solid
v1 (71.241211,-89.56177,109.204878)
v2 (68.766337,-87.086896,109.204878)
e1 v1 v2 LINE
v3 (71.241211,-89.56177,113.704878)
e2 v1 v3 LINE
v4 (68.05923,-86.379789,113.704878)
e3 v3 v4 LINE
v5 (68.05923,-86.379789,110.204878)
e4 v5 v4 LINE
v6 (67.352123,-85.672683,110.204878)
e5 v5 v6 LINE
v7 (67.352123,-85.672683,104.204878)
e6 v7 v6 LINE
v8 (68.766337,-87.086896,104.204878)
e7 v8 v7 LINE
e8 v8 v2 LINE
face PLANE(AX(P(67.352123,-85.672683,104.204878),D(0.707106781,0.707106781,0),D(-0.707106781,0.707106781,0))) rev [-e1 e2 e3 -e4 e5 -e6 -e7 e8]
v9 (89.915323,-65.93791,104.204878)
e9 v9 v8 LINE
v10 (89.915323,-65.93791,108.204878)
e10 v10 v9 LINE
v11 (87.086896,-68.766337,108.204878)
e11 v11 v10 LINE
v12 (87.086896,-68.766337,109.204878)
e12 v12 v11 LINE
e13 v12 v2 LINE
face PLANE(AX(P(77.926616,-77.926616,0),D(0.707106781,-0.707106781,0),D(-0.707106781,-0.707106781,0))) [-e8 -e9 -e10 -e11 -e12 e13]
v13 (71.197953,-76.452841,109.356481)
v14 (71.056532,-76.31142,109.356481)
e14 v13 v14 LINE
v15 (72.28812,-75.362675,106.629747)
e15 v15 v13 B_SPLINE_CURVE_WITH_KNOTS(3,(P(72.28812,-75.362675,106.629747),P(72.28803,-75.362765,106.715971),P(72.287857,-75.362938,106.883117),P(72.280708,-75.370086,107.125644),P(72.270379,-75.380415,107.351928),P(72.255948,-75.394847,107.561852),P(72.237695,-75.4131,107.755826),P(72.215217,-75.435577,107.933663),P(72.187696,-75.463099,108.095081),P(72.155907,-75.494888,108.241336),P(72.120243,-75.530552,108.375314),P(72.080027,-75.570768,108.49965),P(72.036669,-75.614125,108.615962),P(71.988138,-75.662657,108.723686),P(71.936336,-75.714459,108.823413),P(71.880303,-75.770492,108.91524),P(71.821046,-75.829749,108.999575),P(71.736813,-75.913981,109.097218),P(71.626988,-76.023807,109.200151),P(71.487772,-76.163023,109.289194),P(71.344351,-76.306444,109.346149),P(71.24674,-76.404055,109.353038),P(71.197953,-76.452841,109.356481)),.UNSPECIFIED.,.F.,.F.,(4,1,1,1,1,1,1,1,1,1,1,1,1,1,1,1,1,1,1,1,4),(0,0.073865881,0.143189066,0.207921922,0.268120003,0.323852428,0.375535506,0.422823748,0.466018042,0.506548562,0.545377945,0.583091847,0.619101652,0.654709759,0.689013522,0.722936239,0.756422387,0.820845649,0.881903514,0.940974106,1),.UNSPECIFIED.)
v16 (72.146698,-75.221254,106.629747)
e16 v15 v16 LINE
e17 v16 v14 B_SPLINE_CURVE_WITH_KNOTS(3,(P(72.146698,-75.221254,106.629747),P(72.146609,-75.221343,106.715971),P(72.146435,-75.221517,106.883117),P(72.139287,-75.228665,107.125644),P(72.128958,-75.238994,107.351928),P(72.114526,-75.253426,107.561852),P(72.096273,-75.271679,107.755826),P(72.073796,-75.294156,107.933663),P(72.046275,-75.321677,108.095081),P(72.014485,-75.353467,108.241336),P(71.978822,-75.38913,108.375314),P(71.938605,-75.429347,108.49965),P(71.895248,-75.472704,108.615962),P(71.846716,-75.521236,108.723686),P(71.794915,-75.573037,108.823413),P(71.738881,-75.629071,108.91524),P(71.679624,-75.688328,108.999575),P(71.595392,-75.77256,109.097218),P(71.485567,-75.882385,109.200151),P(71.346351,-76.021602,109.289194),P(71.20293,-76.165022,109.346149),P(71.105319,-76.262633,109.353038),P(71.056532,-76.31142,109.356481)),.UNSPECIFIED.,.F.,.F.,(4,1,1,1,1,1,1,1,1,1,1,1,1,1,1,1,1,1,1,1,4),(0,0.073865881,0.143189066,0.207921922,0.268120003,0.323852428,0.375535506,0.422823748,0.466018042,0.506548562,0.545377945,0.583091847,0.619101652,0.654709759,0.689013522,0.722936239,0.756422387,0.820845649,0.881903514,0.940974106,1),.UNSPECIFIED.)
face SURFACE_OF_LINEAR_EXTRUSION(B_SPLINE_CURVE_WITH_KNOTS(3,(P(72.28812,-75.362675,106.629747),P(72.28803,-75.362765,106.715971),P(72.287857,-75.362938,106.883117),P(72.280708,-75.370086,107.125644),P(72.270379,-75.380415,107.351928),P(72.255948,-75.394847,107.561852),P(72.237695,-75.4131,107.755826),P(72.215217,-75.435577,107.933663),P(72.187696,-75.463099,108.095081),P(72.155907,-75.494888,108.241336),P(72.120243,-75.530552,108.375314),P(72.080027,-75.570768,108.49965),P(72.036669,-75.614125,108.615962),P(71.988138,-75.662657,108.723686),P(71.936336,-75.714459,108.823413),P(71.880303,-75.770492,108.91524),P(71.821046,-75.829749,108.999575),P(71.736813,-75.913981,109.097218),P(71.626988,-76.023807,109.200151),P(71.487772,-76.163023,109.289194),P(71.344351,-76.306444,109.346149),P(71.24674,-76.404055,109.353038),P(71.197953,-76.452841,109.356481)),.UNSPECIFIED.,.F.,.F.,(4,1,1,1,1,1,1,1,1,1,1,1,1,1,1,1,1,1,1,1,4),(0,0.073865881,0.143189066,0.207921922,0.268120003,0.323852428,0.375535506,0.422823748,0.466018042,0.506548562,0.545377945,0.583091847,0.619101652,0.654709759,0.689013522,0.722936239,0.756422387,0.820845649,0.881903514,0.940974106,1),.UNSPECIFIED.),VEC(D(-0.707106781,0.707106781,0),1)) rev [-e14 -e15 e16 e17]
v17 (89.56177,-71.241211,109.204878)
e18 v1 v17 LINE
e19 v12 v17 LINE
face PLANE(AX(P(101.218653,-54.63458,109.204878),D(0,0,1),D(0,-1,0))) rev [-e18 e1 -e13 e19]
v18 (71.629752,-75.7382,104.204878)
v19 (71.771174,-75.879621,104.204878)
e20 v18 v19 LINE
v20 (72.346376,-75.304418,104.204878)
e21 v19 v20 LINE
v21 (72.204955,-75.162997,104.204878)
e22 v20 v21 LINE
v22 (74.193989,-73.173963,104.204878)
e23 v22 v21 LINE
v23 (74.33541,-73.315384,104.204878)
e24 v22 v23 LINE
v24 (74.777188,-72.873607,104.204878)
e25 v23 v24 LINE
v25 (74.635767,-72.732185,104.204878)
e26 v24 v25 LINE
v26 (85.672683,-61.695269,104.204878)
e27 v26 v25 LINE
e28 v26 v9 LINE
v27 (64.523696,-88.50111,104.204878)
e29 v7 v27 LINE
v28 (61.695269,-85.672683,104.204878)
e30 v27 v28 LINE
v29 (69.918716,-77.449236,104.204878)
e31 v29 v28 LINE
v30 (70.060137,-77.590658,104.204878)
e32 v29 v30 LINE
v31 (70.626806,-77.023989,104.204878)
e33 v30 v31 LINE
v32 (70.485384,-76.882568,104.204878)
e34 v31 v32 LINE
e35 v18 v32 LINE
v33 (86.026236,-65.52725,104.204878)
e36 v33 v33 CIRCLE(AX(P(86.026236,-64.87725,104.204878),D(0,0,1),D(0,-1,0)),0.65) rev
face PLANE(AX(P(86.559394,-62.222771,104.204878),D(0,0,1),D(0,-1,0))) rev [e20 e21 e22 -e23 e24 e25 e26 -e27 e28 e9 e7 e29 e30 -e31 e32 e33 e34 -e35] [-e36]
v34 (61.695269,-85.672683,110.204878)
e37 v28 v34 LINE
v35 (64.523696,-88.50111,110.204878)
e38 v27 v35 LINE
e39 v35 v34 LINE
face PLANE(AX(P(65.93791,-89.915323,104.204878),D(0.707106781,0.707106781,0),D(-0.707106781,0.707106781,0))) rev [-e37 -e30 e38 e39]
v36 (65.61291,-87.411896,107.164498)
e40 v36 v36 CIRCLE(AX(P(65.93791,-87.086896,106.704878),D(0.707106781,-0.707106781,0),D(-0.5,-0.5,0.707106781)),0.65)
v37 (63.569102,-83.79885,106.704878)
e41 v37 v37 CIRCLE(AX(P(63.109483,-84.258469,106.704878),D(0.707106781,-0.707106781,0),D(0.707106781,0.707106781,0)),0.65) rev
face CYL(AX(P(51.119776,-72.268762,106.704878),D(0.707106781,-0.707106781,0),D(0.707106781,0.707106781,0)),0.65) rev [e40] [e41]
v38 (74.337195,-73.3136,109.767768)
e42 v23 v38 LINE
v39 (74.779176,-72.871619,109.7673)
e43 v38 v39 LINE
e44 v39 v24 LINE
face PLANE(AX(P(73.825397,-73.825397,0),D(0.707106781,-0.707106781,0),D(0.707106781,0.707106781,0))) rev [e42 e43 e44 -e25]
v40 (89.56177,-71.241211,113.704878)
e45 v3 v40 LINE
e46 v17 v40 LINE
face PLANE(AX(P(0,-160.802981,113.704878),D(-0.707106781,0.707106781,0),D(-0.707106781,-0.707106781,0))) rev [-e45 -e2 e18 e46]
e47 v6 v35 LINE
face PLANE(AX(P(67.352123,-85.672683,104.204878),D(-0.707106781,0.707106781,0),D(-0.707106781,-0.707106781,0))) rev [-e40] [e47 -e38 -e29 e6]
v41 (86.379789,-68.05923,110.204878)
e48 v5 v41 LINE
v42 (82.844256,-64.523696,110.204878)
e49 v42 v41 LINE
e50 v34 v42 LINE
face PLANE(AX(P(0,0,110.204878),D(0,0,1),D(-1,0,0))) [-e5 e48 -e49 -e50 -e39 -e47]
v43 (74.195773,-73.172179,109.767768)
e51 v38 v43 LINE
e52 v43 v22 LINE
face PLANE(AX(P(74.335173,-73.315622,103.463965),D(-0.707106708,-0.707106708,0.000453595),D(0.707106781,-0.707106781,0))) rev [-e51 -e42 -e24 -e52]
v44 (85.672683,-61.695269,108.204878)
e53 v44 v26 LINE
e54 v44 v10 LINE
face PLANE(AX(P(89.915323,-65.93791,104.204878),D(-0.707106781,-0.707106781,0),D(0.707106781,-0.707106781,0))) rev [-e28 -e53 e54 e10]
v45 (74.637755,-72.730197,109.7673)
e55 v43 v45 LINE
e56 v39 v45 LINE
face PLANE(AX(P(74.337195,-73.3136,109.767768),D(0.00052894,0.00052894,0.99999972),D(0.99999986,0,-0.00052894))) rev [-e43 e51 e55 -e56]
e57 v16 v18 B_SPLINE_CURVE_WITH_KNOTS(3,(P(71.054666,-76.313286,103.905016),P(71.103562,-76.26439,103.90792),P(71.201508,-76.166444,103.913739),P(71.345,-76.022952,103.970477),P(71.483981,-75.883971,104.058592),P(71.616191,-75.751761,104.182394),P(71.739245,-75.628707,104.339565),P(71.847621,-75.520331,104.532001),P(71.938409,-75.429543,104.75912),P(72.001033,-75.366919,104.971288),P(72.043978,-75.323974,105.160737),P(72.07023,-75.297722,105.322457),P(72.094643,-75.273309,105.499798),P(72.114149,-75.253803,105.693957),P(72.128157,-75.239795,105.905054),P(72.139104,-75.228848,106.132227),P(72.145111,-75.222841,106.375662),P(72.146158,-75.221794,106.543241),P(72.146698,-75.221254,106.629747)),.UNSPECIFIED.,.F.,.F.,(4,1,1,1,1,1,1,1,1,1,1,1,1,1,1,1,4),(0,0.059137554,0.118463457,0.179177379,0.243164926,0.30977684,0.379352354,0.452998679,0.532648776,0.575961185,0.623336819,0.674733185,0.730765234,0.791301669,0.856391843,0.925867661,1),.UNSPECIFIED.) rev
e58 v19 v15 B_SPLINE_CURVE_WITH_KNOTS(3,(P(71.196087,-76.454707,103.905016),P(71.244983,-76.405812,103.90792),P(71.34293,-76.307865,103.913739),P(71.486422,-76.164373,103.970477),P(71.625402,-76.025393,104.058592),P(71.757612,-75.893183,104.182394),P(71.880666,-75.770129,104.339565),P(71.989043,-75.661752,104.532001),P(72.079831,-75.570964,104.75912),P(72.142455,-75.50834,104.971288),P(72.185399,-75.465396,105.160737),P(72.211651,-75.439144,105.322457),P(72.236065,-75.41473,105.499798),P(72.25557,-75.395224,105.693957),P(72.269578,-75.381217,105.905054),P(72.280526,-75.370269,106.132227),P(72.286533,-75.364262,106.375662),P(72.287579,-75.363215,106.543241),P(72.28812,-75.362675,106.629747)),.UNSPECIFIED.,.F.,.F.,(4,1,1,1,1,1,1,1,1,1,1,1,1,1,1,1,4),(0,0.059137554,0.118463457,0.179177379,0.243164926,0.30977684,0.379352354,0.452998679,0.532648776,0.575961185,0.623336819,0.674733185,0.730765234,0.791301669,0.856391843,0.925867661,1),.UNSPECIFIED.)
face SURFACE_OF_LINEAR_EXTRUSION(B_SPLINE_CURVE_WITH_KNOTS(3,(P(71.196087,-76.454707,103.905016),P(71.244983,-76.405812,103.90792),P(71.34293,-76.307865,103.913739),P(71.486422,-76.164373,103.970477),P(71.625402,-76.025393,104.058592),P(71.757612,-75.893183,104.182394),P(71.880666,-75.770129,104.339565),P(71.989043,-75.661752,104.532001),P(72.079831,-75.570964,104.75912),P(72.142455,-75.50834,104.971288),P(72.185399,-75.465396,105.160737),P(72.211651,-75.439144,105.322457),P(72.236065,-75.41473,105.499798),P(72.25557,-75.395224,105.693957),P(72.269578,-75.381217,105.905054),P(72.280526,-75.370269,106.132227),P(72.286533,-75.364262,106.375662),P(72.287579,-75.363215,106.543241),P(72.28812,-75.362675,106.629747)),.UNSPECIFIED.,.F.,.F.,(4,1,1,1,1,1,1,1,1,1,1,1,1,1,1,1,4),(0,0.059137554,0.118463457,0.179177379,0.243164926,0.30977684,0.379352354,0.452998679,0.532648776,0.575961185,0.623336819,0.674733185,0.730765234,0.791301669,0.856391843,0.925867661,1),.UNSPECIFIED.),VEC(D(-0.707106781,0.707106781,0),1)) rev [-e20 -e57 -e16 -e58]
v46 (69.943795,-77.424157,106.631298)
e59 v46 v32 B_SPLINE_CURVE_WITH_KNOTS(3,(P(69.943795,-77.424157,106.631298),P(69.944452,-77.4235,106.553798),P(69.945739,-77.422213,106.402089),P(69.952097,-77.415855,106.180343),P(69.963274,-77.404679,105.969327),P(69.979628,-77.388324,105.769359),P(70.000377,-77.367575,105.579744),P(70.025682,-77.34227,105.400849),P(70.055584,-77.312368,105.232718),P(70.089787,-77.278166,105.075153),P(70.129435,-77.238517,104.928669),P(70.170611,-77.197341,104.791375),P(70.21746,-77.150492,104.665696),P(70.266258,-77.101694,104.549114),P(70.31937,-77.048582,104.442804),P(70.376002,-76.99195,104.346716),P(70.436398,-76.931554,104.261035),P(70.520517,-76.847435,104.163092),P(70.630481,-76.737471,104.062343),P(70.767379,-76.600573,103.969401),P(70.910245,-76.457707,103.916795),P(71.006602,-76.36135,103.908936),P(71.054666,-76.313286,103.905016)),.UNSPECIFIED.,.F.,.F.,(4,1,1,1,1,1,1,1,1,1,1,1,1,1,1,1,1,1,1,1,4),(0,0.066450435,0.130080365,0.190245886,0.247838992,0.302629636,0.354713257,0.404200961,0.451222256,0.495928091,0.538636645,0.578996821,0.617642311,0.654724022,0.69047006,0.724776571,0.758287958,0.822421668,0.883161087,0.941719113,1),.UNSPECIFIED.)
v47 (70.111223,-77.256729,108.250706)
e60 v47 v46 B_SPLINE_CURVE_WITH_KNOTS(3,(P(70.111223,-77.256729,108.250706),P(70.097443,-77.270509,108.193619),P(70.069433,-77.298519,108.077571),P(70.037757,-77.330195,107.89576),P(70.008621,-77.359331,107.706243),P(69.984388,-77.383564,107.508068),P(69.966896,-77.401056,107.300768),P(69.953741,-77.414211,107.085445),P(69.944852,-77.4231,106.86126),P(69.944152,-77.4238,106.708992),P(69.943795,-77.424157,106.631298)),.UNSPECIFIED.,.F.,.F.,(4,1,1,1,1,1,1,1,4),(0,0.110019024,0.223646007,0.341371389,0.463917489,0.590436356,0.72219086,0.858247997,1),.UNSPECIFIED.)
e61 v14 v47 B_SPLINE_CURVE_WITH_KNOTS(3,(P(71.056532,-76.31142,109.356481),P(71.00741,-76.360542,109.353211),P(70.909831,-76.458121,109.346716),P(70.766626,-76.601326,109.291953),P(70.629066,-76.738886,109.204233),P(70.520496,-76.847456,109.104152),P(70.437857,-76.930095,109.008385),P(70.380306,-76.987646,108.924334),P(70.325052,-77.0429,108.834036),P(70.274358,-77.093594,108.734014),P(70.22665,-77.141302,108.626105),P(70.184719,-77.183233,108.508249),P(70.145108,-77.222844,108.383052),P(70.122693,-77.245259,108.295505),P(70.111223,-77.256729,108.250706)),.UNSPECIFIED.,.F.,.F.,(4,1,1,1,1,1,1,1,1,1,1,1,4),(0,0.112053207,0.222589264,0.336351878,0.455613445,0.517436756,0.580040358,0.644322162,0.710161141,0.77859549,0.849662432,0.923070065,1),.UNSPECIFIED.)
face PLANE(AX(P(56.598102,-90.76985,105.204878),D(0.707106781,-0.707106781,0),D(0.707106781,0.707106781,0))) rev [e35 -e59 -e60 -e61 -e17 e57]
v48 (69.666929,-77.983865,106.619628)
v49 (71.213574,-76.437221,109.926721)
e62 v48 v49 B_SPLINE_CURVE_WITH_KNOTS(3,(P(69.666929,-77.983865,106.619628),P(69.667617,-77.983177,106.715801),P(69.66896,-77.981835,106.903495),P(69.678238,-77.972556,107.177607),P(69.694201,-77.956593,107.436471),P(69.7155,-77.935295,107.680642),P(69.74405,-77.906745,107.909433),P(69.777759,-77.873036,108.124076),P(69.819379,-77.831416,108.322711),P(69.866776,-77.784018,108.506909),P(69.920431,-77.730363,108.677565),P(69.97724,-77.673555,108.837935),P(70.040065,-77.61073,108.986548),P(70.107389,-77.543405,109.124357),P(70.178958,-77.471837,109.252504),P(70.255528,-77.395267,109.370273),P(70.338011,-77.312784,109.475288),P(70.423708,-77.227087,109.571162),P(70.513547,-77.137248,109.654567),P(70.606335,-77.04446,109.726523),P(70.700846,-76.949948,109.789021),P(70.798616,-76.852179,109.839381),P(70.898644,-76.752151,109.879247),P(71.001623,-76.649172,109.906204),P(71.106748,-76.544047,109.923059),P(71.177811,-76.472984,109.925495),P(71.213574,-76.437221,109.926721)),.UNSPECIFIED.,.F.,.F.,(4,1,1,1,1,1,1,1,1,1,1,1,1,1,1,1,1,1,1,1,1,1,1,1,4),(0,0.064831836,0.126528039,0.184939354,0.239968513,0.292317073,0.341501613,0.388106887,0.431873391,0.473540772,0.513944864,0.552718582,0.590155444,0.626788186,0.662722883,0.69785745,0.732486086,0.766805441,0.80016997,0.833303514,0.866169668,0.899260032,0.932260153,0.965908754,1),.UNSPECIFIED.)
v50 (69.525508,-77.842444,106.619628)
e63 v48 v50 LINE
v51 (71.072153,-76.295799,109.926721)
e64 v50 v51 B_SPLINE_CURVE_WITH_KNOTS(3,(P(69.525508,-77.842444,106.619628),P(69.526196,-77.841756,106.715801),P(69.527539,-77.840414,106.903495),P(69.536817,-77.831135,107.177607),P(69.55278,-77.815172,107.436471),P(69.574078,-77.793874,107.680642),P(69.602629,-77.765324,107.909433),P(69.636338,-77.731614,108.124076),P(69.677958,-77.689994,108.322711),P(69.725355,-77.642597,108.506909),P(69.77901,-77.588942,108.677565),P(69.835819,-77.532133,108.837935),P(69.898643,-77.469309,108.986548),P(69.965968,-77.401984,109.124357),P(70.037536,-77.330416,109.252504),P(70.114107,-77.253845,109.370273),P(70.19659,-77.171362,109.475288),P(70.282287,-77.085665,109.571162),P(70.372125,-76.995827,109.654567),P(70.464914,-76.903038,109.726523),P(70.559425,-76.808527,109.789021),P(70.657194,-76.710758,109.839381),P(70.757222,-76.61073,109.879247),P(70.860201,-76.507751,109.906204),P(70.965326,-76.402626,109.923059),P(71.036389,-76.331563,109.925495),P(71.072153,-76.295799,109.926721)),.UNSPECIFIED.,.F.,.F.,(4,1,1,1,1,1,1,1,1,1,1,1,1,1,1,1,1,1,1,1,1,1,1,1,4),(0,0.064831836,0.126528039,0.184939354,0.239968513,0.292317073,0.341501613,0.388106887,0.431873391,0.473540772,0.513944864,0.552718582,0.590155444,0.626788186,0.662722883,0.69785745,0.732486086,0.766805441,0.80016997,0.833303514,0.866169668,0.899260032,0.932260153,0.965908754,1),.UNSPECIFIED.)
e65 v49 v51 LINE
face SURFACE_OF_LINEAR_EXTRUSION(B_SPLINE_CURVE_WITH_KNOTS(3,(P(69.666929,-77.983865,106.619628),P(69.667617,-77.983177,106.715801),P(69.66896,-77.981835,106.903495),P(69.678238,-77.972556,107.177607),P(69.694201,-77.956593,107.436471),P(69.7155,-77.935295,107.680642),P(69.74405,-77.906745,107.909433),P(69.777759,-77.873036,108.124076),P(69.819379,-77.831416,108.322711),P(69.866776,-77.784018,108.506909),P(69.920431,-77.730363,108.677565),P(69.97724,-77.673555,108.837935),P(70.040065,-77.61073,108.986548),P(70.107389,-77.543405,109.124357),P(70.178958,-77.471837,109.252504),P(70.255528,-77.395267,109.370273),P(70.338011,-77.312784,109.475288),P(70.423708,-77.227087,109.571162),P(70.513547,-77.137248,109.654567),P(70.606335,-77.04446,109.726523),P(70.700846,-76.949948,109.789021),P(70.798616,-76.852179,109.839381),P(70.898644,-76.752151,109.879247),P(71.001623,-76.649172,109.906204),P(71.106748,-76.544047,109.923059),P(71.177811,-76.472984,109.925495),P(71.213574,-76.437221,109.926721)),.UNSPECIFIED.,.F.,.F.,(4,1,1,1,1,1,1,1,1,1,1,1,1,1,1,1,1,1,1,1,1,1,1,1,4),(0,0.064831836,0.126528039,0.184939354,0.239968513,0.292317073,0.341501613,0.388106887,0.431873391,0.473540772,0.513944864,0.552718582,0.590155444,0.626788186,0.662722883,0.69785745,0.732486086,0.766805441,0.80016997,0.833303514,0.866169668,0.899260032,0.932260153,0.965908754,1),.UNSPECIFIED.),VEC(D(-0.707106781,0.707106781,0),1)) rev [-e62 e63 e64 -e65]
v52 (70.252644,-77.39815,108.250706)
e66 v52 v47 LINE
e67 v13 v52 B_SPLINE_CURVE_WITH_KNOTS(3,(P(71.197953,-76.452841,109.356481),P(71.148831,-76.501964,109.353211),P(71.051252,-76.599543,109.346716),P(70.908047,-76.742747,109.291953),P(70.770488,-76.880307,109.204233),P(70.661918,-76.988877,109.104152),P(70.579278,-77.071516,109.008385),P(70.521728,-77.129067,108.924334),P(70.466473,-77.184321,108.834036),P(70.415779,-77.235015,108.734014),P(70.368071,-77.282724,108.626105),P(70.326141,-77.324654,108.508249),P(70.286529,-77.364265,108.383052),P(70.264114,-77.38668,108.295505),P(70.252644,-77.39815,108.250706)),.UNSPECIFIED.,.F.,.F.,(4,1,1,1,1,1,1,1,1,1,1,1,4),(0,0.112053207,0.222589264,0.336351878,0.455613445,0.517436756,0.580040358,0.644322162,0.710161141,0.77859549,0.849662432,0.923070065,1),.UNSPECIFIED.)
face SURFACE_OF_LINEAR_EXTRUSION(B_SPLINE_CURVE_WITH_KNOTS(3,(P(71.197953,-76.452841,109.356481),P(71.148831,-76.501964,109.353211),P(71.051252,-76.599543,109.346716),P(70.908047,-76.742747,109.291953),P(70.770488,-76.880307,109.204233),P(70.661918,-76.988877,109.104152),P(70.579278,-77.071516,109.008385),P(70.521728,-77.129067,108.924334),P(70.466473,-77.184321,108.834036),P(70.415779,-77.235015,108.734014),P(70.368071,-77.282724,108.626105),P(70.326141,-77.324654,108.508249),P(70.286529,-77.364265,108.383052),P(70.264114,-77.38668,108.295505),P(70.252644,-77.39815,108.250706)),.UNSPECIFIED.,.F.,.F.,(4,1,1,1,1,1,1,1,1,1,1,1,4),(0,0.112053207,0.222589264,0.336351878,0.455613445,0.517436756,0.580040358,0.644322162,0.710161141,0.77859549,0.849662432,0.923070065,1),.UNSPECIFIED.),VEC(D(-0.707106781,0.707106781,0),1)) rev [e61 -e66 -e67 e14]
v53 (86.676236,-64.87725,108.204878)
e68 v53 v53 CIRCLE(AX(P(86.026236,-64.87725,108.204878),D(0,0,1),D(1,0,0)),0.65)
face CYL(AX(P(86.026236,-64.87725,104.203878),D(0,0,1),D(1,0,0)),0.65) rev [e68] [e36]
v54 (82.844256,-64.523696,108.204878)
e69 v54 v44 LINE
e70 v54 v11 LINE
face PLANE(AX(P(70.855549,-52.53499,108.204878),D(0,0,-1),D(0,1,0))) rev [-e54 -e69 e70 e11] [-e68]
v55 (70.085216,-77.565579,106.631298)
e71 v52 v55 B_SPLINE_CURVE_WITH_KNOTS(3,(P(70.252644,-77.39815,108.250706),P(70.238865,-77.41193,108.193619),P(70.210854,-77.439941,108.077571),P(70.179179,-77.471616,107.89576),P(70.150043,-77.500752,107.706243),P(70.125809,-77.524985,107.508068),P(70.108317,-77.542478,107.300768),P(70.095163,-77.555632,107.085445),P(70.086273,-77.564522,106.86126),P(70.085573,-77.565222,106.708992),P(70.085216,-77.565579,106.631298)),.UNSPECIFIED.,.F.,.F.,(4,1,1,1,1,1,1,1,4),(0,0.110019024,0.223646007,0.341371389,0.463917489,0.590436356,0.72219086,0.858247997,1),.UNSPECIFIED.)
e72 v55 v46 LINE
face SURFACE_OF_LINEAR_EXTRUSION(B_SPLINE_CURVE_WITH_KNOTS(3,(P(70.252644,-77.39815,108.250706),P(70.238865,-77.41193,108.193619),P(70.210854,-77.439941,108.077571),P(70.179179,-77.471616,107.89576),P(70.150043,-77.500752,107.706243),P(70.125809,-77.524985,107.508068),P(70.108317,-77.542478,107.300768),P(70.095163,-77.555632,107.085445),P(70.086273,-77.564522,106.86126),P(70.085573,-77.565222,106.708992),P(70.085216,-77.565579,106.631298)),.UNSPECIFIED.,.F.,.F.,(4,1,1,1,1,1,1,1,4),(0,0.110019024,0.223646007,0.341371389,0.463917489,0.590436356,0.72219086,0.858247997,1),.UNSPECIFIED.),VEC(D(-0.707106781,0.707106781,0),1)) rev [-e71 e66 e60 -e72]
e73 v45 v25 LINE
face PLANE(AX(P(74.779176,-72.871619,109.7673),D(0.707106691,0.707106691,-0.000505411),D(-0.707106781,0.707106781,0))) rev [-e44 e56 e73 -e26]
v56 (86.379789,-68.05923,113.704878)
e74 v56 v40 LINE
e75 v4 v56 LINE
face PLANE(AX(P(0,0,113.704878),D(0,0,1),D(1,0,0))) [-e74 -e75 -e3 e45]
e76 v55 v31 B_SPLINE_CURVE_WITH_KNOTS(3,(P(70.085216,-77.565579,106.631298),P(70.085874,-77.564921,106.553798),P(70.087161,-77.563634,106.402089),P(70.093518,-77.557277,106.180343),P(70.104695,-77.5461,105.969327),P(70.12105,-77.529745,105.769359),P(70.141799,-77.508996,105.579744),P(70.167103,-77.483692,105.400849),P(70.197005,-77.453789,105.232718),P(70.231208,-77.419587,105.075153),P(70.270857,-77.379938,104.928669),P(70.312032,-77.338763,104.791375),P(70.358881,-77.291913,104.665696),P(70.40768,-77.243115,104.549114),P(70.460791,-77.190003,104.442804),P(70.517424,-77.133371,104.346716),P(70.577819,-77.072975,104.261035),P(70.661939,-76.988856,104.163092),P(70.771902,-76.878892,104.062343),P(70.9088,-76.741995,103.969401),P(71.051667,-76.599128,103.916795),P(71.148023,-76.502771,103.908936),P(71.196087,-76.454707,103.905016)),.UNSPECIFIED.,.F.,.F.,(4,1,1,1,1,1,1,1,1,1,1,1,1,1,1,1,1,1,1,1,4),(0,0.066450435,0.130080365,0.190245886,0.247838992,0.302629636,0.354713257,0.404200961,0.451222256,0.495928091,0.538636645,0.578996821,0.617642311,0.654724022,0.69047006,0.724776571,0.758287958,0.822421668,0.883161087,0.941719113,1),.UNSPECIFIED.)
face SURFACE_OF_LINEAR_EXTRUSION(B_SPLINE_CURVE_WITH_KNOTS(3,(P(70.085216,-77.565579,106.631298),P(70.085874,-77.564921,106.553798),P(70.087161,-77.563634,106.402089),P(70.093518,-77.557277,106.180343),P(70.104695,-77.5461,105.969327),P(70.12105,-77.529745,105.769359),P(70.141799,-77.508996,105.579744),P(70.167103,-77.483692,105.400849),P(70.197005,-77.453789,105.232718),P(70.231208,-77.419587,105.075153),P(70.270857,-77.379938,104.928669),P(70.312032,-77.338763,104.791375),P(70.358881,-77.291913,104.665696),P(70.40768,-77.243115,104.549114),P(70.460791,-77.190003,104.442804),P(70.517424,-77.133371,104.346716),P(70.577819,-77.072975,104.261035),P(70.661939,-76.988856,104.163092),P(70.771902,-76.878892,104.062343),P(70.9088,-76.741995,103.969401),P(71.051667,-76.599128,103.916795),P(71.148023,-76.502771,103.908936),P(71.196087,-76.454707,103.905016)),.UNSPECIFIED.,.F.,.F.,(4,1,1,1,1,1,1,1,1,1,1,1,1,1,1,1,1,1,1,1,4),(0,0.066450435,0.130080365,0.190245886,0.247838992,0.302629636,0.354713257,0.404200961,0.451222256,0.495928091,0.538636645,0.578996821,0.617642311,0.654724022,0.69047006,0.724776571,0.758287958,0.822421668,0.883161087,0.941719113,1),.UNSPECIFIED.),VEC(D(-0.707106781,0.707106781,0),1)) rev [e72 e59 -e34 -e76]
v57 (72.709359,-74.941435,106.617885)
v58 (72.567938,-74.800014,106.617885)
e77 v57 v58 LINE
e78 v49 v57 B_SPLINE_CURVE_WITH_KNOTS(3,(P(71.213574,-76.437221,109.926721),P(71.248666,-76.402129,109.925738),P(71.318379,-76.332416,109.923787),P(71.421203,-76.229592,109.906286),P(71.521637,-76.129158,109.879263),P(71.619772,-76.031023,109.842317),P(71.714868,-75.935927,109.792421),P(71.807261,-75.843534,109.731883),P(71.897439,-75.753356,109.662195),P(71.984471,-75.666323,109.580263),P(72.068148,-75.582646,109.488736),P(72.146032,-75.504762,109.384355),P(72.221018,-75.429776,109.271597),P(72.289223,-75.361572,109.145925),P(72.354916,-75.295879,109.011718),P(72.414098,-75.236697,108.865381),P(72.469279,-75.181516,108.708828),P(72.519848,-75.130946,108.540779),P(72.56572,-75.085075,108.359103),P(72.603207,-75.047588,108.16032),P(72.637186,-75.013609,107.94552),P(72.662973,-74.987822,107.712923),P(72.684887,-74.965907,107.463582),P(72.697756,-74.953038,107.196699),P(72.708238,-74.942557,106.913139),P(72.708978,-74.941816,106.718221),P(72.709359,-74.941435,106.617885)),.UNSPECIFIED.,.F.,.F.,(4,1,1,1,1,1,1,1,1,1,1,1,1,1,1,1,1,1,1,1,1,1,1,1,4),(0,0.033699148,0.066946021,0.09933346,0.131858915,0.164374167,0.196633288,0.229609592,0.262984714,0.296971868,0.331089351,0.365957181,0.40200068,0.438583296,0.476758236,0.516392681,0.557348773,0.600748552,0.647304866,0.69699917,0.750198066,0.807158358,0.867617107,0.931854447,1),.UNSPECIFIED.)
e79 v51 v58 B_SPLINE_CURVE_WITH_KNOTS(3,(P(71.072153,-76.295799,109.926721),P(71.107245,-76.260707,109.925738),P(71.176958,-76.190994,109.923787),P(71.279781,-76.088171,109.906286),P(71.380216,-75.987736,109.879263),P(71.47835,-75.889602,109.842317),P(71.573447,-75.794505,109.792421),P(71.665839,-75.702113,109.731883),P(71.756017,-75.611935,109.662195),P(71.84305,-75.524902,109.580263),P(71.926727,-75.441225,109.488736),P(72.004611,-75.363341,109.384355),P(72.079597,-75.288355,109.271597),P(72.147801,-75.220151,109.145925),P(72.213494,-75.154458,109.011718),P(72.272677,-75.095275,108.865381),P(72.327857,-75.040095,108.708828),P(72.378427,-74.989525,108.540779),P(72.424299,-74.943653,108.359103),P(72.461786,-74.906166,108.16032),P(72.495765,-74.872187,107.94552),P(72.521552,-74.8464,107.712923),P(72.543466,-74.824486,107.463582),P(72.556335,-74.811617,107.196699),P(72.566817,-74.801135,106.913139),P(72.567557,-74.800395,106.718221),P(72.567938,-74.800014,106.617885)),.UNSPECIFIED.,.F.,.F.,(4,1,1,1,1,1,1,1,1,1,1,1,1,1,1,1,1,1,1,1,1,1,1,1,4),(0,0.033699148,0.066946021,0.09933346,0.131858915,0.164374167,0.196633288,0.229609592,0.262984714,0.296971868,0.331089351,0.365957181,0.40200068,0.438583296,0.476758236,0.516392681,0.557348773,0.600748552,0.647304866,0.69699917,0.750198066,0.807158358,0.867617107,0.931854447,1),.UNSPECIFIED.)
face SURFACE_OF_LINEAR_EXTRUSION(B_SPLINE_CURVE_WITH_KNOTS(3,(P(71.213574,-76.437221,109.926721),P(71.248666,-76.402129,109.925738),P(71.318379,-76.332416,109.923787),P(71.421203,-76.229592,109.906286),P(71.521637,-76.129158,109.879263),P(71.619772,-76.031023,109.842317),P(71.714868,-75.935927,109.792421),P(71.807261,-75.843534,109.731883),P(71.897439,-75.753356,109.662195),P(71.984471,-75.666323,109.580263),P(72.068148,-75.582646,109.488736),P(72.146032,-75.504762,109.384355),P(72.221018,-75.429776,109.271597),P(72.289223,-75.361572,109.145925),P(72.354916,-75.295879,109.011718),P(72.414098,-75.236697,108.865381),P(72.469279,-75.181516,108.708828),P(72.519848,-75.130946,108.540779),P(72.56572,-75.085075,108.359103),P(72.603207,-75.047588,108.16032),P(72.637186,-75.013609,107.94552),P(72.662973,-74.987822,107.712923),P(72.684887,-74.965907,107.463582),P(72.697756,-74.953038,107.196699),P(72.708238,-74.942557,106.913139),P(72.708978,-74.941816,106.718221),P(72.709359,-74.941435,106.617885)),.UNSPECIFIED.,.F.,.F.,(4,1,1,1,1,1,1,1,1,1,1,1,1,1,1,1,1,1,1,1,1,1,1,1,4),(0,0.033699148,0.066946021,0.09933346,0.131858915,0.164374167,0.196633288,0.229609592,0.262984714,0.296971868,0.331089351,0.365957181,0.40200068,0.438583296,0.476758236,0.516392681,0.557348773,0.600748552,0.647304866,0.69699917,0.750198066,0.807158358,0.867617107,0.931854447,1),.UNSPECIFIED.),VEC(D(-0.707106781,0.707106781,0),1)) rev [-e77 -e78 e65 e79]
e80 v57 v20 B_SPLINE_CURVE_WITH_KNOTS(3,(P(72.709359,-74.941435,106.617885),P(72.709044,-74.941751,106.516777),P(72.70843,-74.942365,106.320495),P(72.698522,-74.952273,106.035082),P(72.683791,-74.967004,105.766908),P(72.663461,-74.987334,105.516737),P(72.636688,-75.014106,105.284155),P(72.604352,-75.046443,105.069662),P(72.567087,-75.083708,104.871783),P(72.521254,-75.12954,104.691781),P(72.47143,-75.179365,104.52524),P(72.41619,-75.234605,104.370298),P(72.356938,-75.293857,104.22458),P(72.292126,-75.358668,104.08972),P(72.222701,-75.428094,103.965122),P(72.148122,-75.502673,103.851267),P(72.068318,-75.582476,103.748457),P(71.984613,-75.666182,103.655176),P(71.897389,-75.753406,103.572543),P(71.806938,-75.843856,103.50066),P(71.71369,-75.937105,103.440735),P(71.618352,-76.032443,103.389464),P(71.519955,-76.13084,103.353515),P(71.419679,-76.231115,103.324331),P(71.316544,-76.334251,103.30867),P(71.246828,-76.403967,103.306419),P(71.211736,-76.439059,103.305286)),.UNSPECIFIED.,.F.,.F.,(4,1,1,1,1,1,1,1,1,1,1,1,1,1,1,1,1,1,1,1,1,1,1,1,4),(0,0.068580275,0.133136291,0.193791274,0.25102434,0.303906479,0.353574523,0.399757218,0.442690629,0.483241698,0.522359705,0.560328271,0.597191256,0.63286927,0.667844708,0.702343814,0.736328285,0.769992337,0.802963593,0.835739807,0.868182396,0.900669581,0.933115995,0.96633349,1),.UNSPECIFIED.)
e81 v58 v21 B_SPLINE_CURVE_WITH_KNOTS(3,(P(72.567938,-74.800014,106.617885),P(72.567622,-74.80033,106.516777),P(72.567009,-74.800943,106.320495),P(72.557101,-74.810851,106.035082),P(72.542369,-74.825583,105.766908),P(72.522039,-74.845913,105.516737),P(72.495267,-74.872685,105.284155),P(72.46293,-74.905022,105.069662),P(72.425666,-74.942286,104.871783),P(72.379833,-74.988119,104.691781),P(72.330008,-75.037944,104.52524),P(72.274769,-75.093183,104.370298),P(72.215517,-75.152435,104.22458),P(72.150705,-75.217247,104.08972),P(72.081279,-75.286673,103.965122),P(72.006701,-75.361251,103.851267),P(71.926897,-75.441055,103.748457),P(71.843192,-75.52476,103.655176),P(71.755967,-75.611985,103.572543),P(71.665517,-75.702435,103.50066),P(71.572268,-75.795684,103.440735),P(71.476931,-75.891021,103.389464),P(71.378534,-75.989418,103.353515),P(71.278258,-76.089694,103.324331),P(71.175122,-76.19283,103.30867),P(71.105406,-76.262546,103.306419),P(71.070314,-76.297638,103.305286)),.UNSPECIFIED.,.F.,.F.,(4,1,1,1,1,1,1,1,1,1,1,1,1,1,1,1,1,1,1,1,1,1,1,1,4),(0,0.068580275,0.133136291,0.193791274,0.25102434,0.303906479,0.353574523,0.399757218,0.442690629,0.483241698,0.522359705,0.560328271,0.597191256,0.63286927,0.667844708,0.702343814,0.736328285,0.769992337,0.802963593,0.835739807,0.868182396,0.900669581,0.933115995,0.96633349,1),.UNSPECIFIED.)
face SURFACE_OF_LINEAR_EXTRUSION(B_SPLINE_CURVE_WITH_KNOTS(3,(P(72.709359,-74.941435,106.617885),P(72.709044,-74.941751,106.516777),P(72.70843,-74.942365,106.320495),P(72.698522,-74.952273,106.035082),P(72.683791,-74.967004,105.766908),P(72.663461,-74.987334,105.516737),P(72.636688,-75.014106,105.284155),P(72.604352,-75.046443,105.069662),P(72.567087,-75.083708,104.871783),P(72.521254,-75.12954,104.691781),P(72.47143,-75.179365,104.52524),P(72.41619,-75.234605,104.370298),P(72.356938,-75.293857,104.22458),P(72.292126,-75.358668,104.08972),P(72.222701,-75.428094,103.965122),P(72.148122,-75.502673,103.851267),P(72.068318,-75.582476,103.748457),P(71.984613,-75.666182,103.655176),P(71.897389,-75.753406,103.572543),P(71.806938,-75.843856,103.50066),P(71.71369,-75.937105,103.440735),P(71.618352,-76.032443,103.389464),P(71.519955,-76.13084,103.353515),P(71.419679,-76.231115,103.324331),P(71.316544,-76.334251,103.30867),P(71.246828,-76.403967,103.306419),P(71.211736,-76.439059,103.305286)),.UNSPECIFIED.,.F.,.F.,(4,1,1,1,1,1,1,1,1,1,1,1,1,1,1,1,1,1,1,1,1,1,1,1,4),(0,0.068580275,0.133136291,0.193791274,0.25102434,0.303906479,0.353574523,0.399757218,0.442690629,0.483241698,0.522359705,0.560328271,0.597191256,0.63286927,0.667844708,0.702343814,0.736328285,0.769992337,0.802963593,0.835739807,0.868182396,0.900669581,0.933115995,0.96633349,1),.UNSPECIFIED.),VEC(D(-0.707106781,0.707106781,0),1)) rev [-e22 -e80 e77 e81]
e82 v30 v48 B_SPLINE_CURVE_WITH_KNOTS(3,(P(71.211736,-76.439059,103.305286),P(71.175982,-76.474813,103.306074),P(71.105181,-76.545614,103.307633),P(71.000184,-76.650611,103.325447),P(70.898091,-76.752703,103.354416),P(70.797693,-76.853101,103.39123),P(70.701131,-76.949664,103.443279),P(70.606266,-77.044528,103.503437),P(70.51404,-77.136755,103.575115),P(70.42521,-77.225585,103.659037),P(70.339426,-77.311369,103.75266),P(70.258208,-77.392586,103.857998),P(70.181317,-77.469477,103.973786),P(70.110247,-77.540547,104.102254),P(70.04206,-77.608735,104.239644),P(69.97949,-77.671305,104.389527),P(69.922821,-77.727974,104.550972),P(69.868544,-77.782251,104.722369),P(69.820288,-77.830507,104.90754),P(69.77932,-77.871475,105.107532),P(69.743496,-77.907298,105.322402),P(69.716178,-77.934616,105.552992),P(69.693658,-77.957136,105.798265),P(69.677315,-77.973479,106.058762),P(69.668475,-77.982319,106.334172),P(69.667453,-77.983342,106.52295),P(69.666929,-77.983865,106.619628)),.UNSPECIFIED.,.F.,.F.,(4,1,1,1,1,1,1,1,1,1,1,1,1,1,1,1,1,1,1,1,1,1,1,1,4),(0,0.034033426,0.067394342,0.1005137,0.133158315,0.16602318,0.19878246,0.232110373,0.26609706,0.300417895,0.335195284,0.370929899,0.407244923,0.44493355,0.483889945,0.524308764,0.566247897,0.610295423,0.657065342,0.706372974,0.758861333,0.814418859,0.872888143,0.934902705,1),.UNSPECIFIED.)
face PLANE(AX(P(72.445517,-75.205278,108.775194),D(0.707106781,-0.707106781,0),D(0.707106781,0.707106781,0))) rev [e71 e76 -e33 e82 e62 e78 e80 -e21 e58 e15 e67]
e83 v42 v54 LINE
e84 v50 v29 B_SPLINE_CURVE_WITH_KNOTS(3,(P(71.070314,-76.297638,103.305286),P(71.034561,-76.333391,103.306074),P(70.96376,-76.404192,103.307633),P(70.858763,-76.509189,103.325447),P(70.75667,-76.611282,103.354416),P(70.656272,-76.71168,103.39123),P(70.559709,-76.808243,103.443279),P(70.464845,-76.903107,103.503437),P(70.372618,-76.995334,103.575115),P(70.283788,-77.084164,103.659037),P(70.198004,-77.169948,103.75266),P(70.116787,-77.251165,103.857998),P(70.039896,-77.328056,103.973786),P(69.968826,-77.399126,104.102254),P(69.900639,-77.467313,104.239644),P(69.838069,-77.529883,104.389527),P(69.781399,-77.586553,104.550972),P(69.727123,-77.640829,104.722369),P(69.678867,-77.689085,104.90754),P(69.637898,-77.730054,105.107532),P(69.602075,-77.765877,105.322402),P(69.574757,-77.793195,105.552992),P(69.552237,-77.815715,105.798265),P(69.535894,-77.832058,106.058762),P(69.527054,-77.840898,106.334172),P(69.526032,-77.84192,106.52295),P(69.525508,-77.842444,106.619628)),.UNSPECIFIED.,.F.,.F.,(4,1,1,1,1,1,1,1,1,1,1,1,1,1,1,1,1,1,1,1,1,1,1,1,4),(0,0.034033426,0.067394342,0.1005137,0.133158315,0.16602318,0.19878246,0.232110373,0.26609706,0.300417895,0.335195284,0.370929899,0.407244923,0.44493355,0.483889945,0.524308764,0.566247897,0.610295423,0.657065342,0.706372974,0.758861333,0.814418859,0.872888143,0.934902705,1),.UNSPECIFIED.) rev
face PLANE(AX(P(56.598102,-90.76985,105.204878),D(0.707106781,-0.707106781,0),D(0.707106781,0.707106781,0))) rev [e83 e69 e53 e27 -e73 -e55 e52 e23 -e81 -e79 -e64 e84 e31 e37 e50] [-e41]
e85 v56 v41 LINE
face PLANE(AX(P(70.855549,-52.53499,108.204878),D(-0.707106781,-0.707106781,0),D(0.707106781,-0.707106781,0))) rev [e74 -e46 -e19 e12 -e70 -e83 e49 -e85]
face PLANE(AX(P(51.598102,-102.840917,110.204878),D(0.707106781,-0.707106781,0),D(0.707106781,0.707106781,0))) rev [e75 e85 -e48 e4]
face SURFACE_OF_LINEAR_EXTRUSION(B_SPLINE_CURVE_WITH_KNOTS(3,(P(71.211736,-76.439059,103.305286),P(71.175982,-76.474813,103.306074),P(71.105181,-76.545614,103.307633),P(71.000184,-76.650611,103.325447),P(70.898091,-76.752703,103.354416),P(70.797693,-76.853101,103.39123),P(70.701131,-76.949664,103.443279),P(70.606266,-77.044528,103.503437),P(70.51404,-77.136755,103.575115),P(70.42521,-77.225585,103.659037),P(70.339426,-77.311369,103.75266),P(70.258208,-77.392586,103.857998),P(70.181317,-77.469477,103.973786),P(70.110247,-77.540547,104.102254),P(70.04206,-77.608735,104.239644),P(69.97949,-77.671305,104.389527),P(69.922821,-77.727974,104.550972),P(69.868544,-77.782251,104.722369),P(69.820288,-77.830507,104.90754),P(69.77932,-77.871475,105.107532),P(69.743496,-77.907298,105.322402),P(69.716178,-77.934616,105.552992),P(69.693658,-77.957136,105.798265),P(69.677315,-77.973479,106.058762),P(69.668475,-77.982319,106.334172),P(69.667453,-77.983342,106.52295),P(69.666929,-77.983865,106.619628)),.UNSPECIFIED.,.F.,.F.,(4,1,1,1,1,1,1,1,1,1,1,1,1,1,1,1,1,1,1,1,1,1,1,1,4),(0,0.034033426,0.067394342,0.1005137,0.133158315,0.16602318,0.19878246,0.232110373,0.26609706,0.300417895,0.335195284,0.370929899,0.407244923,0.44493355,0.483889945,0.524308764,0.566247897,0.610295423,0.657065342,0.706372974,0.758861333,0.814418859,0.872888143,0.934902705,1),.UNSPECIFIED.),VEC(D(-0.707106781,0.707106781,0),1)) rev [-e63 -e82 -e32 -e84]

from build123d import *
from build123d.topology import SkipClean

# Parameters (mm, degrees)
STOCK_GOUX_START         = -16.954591703
STOCK_GOUX_LIKED_1_DEPTH = 33.909183406
SKETCH1_W                = 5.499999668
SKETCH1_H                = 5.499999668
BOSS_EXTRUDE1_DEPTH      = 33.909183
CUT_EXTRUDE1_DEPTH       = 0.2
SKETCH5_W                = 5.500000112
SKETCH5_H                = 4
CUT_EXTRUDE2_DEPTH       = 116.998760999
CUT_EXTRUDE3_REACH       = 131.039
SKETCH6_R                = 0.64999997
CIRPATTERN1_COUNT        = 2


# Read off the part's stored shape, not the designer's step: Stock-Goux Liked-1
with BuildPart() as part:
    # Stock-Goux Liked-1 outline → Stock-Goux Liked-1 (new body)
    with BuildSketch(Plane(origin=(0, 0, 0), x_dir=(0.7071067811865471, -0.707106781186548, -1.0381022375924514e-12), z_dir=(0.707106781186548, 0.707106781186547, 1.03810223759245e-12)).offset(STOCK_GOUX_START)):
        Polygon((113.704878, -109.20487811), (110.204877888, -109.20487811), (110.204877888, -104.204878204), (109.704877872, -104.204878204), (109.704877872, -109.704877872), (104.204878204, -109.704877872), (104.204878204, -110.204877888), (109.20487811, -110.204877888), (109.20487811, -113.704878), (113.704878, -113.704878), align=None)
    extrude(amount=STOCK_GOUX_LIKED_1_DEPTH)

    # Sketch1 → Boss-Extrude1 (add)
    with SkipClean():  # the faces are left unmerged after this step: merging them gives an invalid solid
        with BuildSketch(Plane(origin=(-11.988706765, -11.988706765, 0), x_dir=(0, 0, 1), z_dir=(-0.7071067811865476, -0.7071067811865476, -1.0381022375924498e-12))):
            with Locations((106.954878038, -106.954878038)):
                Rectangle(SKETCH1_W, SKETCH1_H)
        extrude(amount=-BOSS_EXTRUDE1_DEPTH)

    # Sketch4 → Cut-Extrude1 (cut)
    # profile 1 of 2: a face of its own
    with SkipClean():  # the faces are left unmerged after this step: merging them gives an invalid solid
        with BuildSketch(Plane(origin=(73.683976011, -73.683976011, 109.3690912), x_dir=(-0.577350269189024, -0.5773502691890293, -0.5773502691908239), z_dir=(0.7071067811865546, -0.7071067811865406, -7.406550393246722e-15))):
            Polygon((1.809420407, 5.9526292), (2.820688436, 5.237745386), (-0.821148503, 0.092362774), (-1.331234641, 0.453620787), (1.954432426, 5.095277437), (1.145418003, 5.667693303), align=None)
        # profile 2 of 2: a face of its own
        with BuildSketch(Plane(origin=(73.683976011, -73.683976011, 109.3690912), x_dir=(-0.577350269189024, -0.5773502691890293, -0.5773502691908239), z_dir=(0.7071067811865546, -0.7071067811865406, -7.406550393246722e-15))):
            with BuildLine():
                add(Edge.make_bspline(
                    [(2.877099219, 1.335109376), (2.935838558, 1.417405427), (3.049870438, 1.577168434), (3.226094966, 1.802117563), (3.397935378, 2.009052811), (3.565846799, 2.196717165), (3.731042214, 2.364759935), (3.892218805, 2.513489688), (4.049493585, 2.6446306), (4.206341025, 2.754179531), (4.360025947, 2.849477701), (4.513266986, 2.930884131), (4.665815664, 3.001483938), (4.818515166, 3.0586782), (4.970617605, 3.103726049), (5.122467787, 3.135794894), (5.273974853, 3.1545795), (5.424485375, 3.162398332), (5.57291168, 3.158649601), (5.71885612, 3.143489484), (5.861127958, 3.116280577), (6.000815508, 3.080299839), (6.135189962, 3.029311133), (6.267827501, 2.971265194), (6.395960204, 2.899842577), (6.477761121, 2.844757759), (6.518936158, 2.817030449)],
                    knots=[0, 0, 0, 0, 1.645926604, 3.195270974, 4.650990582, 6.024584171, 7.293755489, 8.485788563, 9.594173223, 10.624575106, 11.597800751, 12.536632912, 13.44787851, 14.332590146, 15.188862484, 16.028272991, 16.856251527, 17.671878837, 18.479816086, 19.271126229, 20.057755364, 20.836377498, 21.616069947, 22.394783881, 23.192003771, 24, 24, 24, 24], degree=3))
                add(Edge.make_bspline(
                    [(6.518936158, 2.817030449), (6.55976619, 2.787194518), (6.640619439, 2.728112222), (6.751575276, 2.627837993), (6.852736041, 2.520826461), (6.947411421, 2.408793466), (7.028861928, 2.287452494), (7.103669209, 2.160876743), (7.168780117, 2.027049302), (7.222899915, 1.885998413), (7.267901579, 1.739512987), (7.300866367, 1.587191132), (7.322801886, 1.429869211), (7.330695863, 1.26694766), (7.330109349, 1.099094482), (7.315823786, 0.925626884), (7.288049754, 0.747536935), (7.251766786, 0.563275675), (7.200579852, 0.372683439), (7.132420302, 0.175939832), (7.049730345, -0.028750132), (6.948143476, -0.239331033), (6.832538734, -0.457983193), (6.701011573, -0.684022575), (6.552211688, -0.916111082), (6.444401149, -1.071082575), (6.389188562, -1.150447515)],
                    knots=[0, 0, 0, 0, 0.816802234, 1.617464211, 2.412328798, 3.195799554, 3.984556322, 4.770779044, 5.57064894, 6.386329449, 7.210029482, 8.044686804, 8.902317584, 9.773878156, 10.678405193, 11.613358687, 12.583410326, 13.589949519, 14.647090142, 15.769568218, 16.952951381, 18.212671993, 19.546052618, 20.949315433, 22.437664922, 24, 24, 24, 24], degree=3))
                add(Edge.make_bspline(
                    [(6.389188562, -1.150447515), (6.332868819, -1.228410619), (6.222953274, -1.380566091), (6.053980888, -1.59680156), (5.886092947, -1.795129872), (5.720527442, -1.977104519), (5.555468389, -2.14060009), (5.392619894, -2.288332456), (5.229879441, -2.416533943), (5.06880285, -2.528231787), (4.908319086, -2.62376275), (4.750132346, -2.708320198), (4.591787049, -2.778366159), (4.43448342, -2.83591584), (4.277857668, -2.882112619), (4.121447774, -2.915750879), (3.965574172, -2.934147856), (3.811266823, -2.942458126), (3.659376547, -2.93720443), (3.510689745, -2.920194702), (3.36547389, -2.894056504), (3.223504099, -2.855347129), (3.084985381, -2.806224594), (2.95051219, -2.744153097), (2.819392507, -2.672081016), (2.735930058, -2.616047292), (2.693926142, -2.587847355)],
                    knots=[0, 0, 0, 0, 1.555964073, 3.036672929, 4.438544486, 5.759244319, 7.015609763, 8.196038705, 9.314565292, 10.364961386, 11.364978532, 12.334676732, 13.26524597, 14.163730662, 15.042916469, 15.905349198, 16.748578791, 17.579666054, 18.403330588, 19.204079274, 19.99928434, 20.788072044, 21.582240779, 22.374243664, 23.181810095, 24, 24, 24, 24], degree=3))
                add(Edge.make_bspline(
                    [(2.693926142, -2.587847355), (2.653972599, -2.558392707), (2.574601729, -2.49987872), (2.465975341, -2.401634599), (2.365605333, -2.297566017), (2.2736202, -2.1872728), (2.192619489, -2.068887343), (2.120885752, -1.944019679), (2.056991419, -1.813489721), (2.003797834, -1.675531189), (1.960019447, -1.532477258), (1.930351112, -1.383658885), (1.908865252, -1.230366615), (1.902666695, -1.072067221), (1.904295565, -0.908849471), (1.920445231, -0.741043703), (1.947114369, -0.568163649), (1.985744352, -0.389662384), (2.037667139, -0.203869884), (2.109148043, -0.010956547), (2.193927603, 0.192170439), (2.298441048, 0.403140358), (2.41709386, 0.624619201), (2.556318665, 0.8530354), (2.707928908, 1.093119466), (2.819610096, 1.252873979), (2.877099219, 1.335109376)],
                    knots=[0, 0, 0, 0, 0.808779551, 1.606704505, 2.384003051, 3.164613963, 3.944979997, 4.719198901, 5.510630197, 6.311633127, 7.127324821, 7.946144414, 8.782972344, 9.648016313, 10.525999108, 11.442197657, 12.393424347, 13.376370558, 14.417965243, 15.535316785, 16.727980085, 18.004753573, 19.371800586, 20.822810559, 22.364506719, 24, 24, 24, 24], degree=3))
            make_face()
            with BuildLine():
                add(Edge.make_bspline(
                    [(3.35665651, 0.981483574), (3.306978299, 0.911008481), (3.210677048, 0.774392459), (3.078907805, 0.570533382), (2.960189865, 0.377340166), (2.855654482, 0.194154463), (2.764740054, 0.020871626), (2.688020563, -0.142683987), (2.626604617, -0.296952862), (2.578871536, -0.44232507), (2.542700408, -0.580836662), (2.517352523, -0.715193163), (2.500264654, -0.845562566), (2.494109389, -0.973145552), (2.496347211, -1.096867933), (2.508033102, -1.217594791), (2.527765974, -1.33483755), (2.568655303, -1.483337821), (2.636042316, -1.657054286), (2.74538605, -1.843427475), (2.878111587, -2.00703341), (2.986845425, -2.092357104), (3.041191767, -2.135002804)],
                    knots=[0, 0, 0, 0, 1.477317626, 2.863781319, 4.158438436, 5.362400069, 6.477048567, 7.510710121, 8.456474969, 9.320360837, 10.130971237, 10.907558897, 11.661836949, 12.382033042, 13.094195176, 13.780270445, 14.458724783, 15.128447747, 16.416912985, 17.638070278, 18.819482119, 20, 20, 20, 20], degree=3))
                add(Edge.make_bspline(
                    [(3.041191767, -2.135002804), (3.099800739, -2.17244124), (3.216225144, -2.246811213), (3.413201595, -2.319023125), (3.622686973, -2.359717176), (3.805834636, -2.366647976), (3.95654946, -2.355929609), (4.071529863, -2.334291982), (4.187465506, -2.305679231), (4.303749507, -2.265403285), (4.421139745, -2.216249685), (4.537600801, -2.154256666), (4.65562294, -2.084375634), (4.732050575, -2.03119598), (4.771159716, -2.003983172)],
                    knots=[0, 0, 0, 0, 1.344638482, 2.671071166, 4.036222541, 5.467361339, 6.209241076, 6.960484297, 7.73186595, 8.521933696, 9.343145882, 10.195949186, 11.076840779, 12, 12, 12, 12], degree=3))
                add(Edge.make_bspline(
                    [(4.771159716, -2.003983172), (4.82003051, -1.9686221), (4.919374766, -1.896740325), (5.060918815, -1.774154816), (5.203980243, -1.643204395), (5.346378414, -1.50118221), (5.486261966, -1.346204267), (5.625768107, -1.181134288), (5.765465845, -1.005346674), (5.854185711, -0.881592057), (5.899454988, -0.818446313)],
                    knots=[0, 0, 0, 0, 0.88015219, 1.789168058, 2.730971114, 3.71133991, 4.723490847, 5.777526881, 6.865983973, 8, 8, 8, 8], degree=3))
                add(Edge.make_bspline(
                    [(5.899454988, -0.818446313), (5.943440103, -0.754631373), (6.029543374, -0.629710132), (6.150227485, -0.443464789), (6.259152206, -0.262044693), (6.355718777, -0.085418135), (6.441234167, 0.086343364), (6.515300272, 0.253071347), (6.577842064, 0.414764781), (6.629318725, 0.571342113), (6.668108931, 0.723318751), (6.699830384, 0.869038513), (6.718294541, 1.009907895), (6.729255617, 1.144940449), (6.729305449, 1.27510735), (6.719388817, 1.399803316), (6.699117623, 1.519074129), (6.658532604, 1.667727811), (6.589724745, 1.839773408), (6.485308774, 2.027436778), (6.35071278, 2.187039301), (6.243987251, 2.272131395), (6.190751062, 2.314576523)],
                    knots=[0, 0, 0, 0, 1.329008706, 2.601607309, 3.804917726, 4.956779838, 6.052592714, 7.094265147, 8.08401922, 9.024445114, 9.918561811, 10.772732897, 11.579936426, 12.352846219, 13.094480438, 13.809401199, 14.495531423, 15.16575916, 16.448433362, 17.663221731, 18.834382256, 20, 20, 20, 20], degree=3))
                add(Edge.make_bspline(
                    [(6.190751062, 2.314576523), (6.132614295, 2.352127809), (6.016155599, 2.427349979), (5.81770787, 2.498184297), (5.606353968, 2.539715843), (5.382213361, 2.546580658), (5.149380752, 2.518724602), (4.913135228, 2.450090337), (4.677174981, 2.338776518), (4.482367978, 2.216674302), (4.323401293, 2.097053878), (4.19971893, 1.986444491), (4.06914087, 1.861579711), (3.934519899, 1.718976231), (3.796468021, 1.558053158), (3.652668391, 1.381505856), (3.505185008, 1.187646731), (3.407224802, 1.051674271), (3.35665651, 0.981483574)],
                    knots=[0, 0, 0, 0, 0.946200866, 1.895415318, 2.86683806, 3.890638819, 4.95642944, 6.069637659, 7.24797886, 8.522380418, 9.215378954, 9.973389102, 10.795730965, 11.692243744, 12.6608267, 13.702269491, 14.813882584, 16, 16, 16, 16], degree=3))
            make_face(mode=Mode.SUBTRACT)
        extrude(amount=CUT_EXTRUDE1_DEPTH, mode=Mode.SUBTRACT)

    # Sketch5 → Cut-Extrude2 (cut, symmetric)
    with BuildSketch(Plane(origin=(77.926616474, -77.926616474, 0), x_dir=(0, 0, -1), z_dir=(0.7071067811865549, -0.7071067811865401, -7.502698527565898e-15))):
        with Locations((-110.954877944, 14.954591703)):
            Rectangle(SKETCH5_W, SKETCH5_H)
    cut_extrude2 = extrude(amount=CUT_EXTRUDE2_DEPTH, both=True, mode=Mode.SUBTRACT)

    # Sketch6 → Cut-Extrude3 (cut, up to next)
    with BuildSketch(Plane.XY.offset(108.204877888), mode=Mode.PRIVATE) as cut_extrude3_sk1:
        with Locations((86.026236134, -64.877249727)):
            Circle(SKETCH6_R)
    cut_extrude3_tool1 = extrude(cut_extrude3_sk1.sketch, amount=-CUT_EXTRUDE3_REACH, mode=Mode.PRIVATE) & part.part
    cut_extrude3 = cut_extrude3_tool1.solids().sort_by_distance((86.026236, -64.87725, 108.204878))[0]
    add(cut_extrude3, mode=Mode.SUBTRACT)

    # CirPattern1: Cut-Extrude2, Cut-Extrude3 ×2 about axis
    cirpattern1_axis = Axis((0, 0, 0), (0.49999999999973677, -0.5000000000002639, 0.7071067811865471))
    add([cut_extrude2.rotate(cirpattern1_axis, i * 360 / CIRPATTERN1_COUNT) for i in range(1, CIRPATTERN1_COUNT)], mode=Mode.SUBTRACT)
    add([cut_extrude3.rotate(cirpattern1_axis, i * 360 / CIRPATTERN1_COUNT) for i in range(1, CIRPATTERN1_COUNT)], mode=Mode.SUBTRACT)


solid = part.part
